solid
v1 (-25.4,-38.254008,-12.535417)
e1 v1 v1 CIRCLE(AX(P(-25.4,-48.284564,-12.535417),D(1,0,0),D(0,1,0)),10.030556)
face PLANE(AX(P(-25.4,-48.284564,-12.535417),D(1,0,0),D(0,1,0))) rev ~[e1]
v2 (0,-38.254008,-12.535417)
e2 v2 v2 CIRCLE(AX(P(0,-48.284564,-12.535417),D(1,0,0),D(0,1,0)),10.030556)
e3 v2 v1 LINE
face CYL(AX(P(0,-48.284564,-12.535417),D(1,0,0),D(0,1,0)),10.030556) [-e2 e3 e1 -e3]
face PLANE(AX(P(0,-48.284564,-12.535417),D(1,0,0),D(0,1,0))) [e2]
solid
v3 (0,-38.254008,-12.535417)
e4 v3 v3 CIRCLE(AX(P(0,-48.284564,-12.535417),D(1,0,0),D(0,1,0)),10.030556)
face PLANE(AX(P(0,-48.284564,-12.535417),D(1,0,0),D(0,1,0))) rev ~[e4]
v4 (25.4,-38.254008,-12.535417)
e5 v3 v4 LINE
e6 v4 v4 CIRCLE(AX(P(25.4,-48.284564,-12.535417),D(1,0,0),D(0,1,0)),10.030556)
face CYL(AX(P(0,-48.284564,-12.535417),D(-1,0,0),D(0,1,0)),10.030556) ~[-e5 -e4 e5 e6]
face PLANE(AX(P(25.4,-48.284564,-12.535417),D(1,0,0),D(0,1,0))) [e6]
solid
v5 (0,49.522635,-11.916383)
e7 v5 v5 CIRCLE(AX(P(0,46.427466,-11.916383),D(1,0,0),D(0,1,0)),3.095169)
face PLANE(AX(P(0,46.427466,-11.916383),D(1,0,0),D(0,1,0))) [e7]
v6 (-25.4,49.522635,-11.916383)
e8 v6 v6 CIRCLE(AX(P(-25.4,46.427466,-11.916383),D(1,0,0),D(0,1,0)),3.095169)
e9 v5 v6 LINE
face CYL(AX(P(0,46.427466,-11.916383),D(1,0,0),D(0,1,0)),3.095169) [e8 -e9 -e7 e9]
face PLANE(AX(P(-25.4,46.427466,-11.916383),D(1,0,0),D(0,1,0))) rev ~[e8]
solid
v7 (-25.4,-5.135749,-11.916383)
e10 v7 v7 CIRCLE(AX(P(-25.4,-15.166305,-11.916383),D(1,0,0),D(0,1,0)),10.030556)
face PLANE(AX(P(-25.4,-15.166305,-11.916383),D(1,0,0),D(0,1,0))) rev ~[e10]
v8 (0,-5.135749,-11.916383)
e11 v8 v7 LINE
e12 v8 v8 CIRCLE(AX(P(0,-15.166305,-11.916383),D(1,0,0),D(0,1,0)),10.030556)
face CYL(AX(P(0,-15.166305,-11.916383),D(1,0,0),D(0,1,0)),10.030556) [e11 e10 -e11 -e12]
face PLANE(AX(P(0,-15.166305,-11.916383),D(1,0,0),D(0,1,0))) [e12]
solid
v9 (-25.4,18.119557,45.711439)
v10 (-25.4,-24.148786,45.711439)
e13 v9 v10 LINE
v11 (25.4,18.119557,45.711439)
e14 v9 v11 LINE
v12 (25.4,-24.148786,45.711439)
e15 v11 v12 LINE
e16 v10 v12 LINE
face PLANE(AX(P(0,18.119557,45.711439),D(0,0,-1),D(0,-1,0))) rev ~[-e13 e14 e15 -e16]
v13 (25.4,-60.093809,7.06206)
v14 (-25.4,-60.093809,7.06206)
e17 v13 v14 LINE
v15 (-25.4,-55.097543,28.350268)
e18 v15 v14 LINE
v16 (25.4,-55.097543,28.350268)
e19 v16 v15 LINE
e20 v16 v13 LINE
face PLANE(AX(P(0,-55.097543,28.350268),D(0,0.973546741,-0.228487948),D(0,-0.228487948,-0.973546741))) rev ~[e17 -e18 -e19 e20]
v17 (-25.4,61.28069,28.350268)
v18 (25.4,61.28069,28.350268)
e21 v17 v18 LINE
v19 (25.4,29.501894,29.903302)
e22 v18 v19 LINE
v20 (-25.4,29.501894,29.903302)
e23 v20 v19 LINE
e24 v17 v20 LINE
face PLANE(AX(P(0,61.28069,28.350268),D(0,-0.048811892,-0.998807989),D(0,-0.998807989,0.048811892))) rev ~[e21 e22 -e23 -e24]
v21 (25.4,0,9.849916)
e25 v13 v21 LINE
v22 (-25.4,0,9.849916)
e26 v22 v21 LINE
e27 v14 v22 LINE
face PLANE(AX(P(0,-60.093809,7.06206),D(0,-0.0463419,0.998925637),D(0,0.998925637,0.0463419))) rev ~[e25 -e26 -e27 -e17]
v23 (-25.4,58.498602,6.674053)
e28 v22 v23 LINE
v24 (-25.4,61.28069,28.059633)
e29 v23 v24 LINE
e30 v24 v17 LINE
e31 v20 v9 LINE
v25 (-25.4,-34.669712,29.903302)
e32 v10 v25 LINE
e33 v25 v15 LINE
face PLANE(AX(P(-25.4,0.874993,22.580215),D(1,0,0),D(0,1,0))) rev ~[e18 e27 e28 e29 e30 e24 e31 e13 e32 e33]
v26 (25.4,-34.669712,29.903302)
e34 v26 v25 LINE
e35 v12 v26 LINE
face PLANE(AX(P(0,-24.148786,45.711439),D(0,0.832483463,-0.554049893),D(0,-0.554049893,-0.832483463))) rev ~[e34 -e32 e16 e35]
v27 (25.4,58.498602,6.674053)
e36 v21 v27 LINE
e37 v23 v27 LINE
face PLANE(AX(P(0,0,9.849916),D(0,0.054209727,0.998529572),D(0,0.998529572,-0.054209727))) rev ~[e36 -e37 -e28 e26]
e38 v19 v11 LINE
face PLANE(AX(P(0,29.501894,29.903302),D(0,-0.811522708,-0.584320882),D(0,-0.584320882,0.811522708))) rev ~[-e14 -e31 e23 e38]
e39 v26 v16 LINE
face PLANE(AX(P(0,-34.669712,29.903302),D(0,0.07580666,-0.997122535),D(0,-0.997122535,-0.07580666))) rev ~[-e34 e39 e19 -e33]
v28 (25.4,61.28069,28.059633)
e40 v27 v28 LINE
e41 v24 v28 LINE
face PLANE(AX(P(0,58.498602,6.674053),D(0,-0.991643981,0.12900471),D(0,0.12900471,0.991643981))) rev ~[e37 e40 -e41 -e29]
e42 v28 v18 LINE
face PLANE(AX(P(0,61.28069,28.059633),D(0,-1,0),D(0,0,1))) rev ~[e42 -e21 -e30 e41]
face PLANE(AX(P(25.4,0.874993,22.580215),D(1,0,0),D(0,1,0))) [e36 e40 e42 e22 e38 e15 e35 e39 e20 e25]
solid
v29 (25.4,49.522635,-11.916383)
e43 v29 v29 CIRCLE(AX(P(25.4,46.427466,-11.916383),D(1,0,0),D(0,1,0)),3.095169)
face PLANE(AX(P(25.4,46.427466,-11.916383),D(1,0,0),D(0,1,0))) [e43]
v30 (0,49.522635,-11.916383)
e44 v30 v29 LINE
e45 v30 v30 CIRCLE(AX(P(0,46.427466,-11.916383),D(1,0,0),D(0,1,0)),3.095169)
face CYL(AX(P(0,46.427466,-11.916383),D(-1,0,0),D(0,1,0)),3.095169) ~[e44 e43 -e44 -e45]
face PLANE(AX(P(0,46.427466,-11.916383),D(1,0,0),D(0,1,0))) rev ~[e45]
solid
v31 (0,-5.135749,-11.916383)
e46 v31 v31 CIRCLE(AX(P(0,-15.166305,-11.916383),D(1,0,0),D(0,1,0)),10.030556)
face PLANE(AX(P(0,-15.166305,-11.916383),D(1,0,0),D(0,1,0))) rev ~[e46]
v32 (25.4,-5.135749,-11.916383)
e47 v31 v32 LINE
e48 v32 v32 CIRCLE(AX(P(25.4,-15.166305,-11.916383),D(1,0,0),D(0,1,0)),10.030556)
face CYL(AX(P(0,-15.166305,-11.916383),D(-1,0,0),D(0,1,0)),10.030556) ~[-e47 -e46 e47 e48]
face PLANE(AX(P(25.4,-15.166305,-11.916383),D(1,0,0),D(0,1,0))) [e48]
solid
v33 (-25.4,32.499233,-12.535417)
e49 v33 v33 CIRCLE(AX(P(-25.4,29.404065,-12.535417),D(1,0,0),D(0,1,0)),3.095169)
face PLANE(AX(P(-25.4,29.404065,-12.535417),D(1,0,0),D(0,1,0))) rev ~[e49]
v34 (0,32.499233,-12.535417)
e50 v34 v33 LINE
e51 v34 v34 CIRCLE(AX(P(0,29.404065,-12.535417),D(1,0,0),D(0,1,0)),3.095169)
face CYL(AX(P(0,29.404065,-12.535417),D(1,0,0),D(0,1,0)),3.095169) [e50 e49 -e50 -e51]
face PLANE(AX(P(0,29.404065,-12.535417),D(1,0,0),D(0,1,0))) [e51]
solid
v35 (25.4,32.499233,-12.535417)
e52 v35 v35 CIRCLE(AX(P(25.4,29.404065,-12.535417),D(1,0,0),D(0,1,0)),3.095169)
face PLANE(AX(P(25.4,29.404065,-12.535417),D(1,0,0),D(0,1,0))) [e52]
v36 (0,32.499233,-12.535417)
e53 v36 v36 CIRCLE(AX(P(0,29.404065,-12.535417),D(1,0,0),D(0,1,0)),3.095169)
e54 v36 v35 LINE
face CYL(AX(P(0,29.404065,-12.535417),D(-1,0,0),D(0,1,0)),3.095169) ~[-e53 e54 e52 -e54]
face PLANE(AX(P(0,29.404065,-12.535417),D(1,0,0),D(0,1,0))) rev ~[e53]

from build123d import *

# Parameters (mm, degrees)
F1_DEPTH = 25.4
F0_R     = 10.0305561335
F0_R_2   = 3.0951686204
F3_DEPTH = 25.4
F2_R     = 10.0305561335
F2_R_2   = 3.0951686204


with BuildPart() as f1:
    # F0 (on Right) → F1 (new body)
    with BuildSketch(Plane.YZ):
        Polygon((-55.0975427032, 28.3502675593), (-60.0938091379, 7.062059809), (0, 9.8499162998), (58.4986023605, 6.6740531474), (61.2806901336, 28.0596334487), (61.2806901336, 28.3502675593), (29.5018939694, 29.9033019692), (18.1195573523, 45.7114391029), (-24.1487864405, 45.7114391029), (-34.6697121859, 29.9033019692), align=None)
    extrude(amount=-F1_DEPTH)

    # F2 (on Right) → F3 (join)
    with BuildSketch(Plane.YZ):
        Polygon((-60.0938091379, 7.062059809), (0, 9.8499162998), (58.4986023605, 6.6740531474), (61.2806901336, 28.0596334487), (61.2806901336, 28.3502675593), (29.5018939694, 29.9033019692), (18.1195573523, 45.7114391029), (-24.1487864405, 45.7114391029), (-34.6697121859, 29.9033019692), (-55.0975427032, 28.3502675593), align=None)
    extrude(amount=F3_DEPTH)


with BuildPart() as f1b:
    # F0 (on Right) → F1, piece 2 (new body)
    with BuildSketch(Plane.YZ):
        with Locations((-48.2845641673, -12.5354165211)):
            Circle(F0_R)
    extrude(amount=-F1_DEPTH)


with BuildPart() as f1c:
    # F0 (on Right) → F1, piece 3 (new body)
    with BuildSketch(Plane.YZ):
        with Locations((-15.1663050056, -11.9163831696)):
            Circle(F0_R)
    extrude(amount=-F1_DEPTH)


with BuildPart() as f1d:
    # F0 (on Right) → F1, piece 4 (new body)
    with BuildSketch(Plane.YZ):
        with Locations((46.4274659753, -11.9163831696)):
            Circle(F0_R_2)
    extrude(amount=-F1_DEPTH)


with BuildPart() as f1e:
    # F0 (on Right) → F1, piece 5 (new body)
    with BuildSketch(Plane.YZ):
        with Locations((29.4040646404, -12.5354165211)):
            Circle(F0_R_2)
    extrude(amount=-F1_DEPTH)


with BuildPart() as f3:
    # F2 (on Right) → F3, piece 2 (new body)
    with BuildSketch(Plane.YZ):
        with Locations((-48.2845641673, -12.5354165211)):
            Circle(F2_R)
    extrude(amount=F3_DEPTH)


with BuildPart() as f3b:
    # F2 (on Right) → F3, piece 3 (new body)
    with BuildSketch(Plane.YZ):
        with Locations((-15.1663050056, -11.9163831696)):
            Circle(F2_R)
    extrude(amount=F3_DEPTH)


with BuildPart() as f3c:
    # F2 (on Right) → F3, piece 4 (new body)
    with BuildSketch(Plane.YZ):
        with Locations((46.4274659753, -11.9163831696)):
            Circle(F2_R_2)
    extrude(amount=F3_DEPTH)


with BuildPart() as f3d:
    # F2 (on Right) → F3, piece 5 (new body)
    with BuildSketch(Plane.YZ):
        with Locations((29.4040646404, -12.5354165211)):
            Circle(F2_R_2)
    extrude(amount=F3_DEPTH)


solid = Compound([f1.part, f1b.part, f1c.part, f1d.part, f1e.part, f3.part, f3b.part, f3c.part, f3d.part])
